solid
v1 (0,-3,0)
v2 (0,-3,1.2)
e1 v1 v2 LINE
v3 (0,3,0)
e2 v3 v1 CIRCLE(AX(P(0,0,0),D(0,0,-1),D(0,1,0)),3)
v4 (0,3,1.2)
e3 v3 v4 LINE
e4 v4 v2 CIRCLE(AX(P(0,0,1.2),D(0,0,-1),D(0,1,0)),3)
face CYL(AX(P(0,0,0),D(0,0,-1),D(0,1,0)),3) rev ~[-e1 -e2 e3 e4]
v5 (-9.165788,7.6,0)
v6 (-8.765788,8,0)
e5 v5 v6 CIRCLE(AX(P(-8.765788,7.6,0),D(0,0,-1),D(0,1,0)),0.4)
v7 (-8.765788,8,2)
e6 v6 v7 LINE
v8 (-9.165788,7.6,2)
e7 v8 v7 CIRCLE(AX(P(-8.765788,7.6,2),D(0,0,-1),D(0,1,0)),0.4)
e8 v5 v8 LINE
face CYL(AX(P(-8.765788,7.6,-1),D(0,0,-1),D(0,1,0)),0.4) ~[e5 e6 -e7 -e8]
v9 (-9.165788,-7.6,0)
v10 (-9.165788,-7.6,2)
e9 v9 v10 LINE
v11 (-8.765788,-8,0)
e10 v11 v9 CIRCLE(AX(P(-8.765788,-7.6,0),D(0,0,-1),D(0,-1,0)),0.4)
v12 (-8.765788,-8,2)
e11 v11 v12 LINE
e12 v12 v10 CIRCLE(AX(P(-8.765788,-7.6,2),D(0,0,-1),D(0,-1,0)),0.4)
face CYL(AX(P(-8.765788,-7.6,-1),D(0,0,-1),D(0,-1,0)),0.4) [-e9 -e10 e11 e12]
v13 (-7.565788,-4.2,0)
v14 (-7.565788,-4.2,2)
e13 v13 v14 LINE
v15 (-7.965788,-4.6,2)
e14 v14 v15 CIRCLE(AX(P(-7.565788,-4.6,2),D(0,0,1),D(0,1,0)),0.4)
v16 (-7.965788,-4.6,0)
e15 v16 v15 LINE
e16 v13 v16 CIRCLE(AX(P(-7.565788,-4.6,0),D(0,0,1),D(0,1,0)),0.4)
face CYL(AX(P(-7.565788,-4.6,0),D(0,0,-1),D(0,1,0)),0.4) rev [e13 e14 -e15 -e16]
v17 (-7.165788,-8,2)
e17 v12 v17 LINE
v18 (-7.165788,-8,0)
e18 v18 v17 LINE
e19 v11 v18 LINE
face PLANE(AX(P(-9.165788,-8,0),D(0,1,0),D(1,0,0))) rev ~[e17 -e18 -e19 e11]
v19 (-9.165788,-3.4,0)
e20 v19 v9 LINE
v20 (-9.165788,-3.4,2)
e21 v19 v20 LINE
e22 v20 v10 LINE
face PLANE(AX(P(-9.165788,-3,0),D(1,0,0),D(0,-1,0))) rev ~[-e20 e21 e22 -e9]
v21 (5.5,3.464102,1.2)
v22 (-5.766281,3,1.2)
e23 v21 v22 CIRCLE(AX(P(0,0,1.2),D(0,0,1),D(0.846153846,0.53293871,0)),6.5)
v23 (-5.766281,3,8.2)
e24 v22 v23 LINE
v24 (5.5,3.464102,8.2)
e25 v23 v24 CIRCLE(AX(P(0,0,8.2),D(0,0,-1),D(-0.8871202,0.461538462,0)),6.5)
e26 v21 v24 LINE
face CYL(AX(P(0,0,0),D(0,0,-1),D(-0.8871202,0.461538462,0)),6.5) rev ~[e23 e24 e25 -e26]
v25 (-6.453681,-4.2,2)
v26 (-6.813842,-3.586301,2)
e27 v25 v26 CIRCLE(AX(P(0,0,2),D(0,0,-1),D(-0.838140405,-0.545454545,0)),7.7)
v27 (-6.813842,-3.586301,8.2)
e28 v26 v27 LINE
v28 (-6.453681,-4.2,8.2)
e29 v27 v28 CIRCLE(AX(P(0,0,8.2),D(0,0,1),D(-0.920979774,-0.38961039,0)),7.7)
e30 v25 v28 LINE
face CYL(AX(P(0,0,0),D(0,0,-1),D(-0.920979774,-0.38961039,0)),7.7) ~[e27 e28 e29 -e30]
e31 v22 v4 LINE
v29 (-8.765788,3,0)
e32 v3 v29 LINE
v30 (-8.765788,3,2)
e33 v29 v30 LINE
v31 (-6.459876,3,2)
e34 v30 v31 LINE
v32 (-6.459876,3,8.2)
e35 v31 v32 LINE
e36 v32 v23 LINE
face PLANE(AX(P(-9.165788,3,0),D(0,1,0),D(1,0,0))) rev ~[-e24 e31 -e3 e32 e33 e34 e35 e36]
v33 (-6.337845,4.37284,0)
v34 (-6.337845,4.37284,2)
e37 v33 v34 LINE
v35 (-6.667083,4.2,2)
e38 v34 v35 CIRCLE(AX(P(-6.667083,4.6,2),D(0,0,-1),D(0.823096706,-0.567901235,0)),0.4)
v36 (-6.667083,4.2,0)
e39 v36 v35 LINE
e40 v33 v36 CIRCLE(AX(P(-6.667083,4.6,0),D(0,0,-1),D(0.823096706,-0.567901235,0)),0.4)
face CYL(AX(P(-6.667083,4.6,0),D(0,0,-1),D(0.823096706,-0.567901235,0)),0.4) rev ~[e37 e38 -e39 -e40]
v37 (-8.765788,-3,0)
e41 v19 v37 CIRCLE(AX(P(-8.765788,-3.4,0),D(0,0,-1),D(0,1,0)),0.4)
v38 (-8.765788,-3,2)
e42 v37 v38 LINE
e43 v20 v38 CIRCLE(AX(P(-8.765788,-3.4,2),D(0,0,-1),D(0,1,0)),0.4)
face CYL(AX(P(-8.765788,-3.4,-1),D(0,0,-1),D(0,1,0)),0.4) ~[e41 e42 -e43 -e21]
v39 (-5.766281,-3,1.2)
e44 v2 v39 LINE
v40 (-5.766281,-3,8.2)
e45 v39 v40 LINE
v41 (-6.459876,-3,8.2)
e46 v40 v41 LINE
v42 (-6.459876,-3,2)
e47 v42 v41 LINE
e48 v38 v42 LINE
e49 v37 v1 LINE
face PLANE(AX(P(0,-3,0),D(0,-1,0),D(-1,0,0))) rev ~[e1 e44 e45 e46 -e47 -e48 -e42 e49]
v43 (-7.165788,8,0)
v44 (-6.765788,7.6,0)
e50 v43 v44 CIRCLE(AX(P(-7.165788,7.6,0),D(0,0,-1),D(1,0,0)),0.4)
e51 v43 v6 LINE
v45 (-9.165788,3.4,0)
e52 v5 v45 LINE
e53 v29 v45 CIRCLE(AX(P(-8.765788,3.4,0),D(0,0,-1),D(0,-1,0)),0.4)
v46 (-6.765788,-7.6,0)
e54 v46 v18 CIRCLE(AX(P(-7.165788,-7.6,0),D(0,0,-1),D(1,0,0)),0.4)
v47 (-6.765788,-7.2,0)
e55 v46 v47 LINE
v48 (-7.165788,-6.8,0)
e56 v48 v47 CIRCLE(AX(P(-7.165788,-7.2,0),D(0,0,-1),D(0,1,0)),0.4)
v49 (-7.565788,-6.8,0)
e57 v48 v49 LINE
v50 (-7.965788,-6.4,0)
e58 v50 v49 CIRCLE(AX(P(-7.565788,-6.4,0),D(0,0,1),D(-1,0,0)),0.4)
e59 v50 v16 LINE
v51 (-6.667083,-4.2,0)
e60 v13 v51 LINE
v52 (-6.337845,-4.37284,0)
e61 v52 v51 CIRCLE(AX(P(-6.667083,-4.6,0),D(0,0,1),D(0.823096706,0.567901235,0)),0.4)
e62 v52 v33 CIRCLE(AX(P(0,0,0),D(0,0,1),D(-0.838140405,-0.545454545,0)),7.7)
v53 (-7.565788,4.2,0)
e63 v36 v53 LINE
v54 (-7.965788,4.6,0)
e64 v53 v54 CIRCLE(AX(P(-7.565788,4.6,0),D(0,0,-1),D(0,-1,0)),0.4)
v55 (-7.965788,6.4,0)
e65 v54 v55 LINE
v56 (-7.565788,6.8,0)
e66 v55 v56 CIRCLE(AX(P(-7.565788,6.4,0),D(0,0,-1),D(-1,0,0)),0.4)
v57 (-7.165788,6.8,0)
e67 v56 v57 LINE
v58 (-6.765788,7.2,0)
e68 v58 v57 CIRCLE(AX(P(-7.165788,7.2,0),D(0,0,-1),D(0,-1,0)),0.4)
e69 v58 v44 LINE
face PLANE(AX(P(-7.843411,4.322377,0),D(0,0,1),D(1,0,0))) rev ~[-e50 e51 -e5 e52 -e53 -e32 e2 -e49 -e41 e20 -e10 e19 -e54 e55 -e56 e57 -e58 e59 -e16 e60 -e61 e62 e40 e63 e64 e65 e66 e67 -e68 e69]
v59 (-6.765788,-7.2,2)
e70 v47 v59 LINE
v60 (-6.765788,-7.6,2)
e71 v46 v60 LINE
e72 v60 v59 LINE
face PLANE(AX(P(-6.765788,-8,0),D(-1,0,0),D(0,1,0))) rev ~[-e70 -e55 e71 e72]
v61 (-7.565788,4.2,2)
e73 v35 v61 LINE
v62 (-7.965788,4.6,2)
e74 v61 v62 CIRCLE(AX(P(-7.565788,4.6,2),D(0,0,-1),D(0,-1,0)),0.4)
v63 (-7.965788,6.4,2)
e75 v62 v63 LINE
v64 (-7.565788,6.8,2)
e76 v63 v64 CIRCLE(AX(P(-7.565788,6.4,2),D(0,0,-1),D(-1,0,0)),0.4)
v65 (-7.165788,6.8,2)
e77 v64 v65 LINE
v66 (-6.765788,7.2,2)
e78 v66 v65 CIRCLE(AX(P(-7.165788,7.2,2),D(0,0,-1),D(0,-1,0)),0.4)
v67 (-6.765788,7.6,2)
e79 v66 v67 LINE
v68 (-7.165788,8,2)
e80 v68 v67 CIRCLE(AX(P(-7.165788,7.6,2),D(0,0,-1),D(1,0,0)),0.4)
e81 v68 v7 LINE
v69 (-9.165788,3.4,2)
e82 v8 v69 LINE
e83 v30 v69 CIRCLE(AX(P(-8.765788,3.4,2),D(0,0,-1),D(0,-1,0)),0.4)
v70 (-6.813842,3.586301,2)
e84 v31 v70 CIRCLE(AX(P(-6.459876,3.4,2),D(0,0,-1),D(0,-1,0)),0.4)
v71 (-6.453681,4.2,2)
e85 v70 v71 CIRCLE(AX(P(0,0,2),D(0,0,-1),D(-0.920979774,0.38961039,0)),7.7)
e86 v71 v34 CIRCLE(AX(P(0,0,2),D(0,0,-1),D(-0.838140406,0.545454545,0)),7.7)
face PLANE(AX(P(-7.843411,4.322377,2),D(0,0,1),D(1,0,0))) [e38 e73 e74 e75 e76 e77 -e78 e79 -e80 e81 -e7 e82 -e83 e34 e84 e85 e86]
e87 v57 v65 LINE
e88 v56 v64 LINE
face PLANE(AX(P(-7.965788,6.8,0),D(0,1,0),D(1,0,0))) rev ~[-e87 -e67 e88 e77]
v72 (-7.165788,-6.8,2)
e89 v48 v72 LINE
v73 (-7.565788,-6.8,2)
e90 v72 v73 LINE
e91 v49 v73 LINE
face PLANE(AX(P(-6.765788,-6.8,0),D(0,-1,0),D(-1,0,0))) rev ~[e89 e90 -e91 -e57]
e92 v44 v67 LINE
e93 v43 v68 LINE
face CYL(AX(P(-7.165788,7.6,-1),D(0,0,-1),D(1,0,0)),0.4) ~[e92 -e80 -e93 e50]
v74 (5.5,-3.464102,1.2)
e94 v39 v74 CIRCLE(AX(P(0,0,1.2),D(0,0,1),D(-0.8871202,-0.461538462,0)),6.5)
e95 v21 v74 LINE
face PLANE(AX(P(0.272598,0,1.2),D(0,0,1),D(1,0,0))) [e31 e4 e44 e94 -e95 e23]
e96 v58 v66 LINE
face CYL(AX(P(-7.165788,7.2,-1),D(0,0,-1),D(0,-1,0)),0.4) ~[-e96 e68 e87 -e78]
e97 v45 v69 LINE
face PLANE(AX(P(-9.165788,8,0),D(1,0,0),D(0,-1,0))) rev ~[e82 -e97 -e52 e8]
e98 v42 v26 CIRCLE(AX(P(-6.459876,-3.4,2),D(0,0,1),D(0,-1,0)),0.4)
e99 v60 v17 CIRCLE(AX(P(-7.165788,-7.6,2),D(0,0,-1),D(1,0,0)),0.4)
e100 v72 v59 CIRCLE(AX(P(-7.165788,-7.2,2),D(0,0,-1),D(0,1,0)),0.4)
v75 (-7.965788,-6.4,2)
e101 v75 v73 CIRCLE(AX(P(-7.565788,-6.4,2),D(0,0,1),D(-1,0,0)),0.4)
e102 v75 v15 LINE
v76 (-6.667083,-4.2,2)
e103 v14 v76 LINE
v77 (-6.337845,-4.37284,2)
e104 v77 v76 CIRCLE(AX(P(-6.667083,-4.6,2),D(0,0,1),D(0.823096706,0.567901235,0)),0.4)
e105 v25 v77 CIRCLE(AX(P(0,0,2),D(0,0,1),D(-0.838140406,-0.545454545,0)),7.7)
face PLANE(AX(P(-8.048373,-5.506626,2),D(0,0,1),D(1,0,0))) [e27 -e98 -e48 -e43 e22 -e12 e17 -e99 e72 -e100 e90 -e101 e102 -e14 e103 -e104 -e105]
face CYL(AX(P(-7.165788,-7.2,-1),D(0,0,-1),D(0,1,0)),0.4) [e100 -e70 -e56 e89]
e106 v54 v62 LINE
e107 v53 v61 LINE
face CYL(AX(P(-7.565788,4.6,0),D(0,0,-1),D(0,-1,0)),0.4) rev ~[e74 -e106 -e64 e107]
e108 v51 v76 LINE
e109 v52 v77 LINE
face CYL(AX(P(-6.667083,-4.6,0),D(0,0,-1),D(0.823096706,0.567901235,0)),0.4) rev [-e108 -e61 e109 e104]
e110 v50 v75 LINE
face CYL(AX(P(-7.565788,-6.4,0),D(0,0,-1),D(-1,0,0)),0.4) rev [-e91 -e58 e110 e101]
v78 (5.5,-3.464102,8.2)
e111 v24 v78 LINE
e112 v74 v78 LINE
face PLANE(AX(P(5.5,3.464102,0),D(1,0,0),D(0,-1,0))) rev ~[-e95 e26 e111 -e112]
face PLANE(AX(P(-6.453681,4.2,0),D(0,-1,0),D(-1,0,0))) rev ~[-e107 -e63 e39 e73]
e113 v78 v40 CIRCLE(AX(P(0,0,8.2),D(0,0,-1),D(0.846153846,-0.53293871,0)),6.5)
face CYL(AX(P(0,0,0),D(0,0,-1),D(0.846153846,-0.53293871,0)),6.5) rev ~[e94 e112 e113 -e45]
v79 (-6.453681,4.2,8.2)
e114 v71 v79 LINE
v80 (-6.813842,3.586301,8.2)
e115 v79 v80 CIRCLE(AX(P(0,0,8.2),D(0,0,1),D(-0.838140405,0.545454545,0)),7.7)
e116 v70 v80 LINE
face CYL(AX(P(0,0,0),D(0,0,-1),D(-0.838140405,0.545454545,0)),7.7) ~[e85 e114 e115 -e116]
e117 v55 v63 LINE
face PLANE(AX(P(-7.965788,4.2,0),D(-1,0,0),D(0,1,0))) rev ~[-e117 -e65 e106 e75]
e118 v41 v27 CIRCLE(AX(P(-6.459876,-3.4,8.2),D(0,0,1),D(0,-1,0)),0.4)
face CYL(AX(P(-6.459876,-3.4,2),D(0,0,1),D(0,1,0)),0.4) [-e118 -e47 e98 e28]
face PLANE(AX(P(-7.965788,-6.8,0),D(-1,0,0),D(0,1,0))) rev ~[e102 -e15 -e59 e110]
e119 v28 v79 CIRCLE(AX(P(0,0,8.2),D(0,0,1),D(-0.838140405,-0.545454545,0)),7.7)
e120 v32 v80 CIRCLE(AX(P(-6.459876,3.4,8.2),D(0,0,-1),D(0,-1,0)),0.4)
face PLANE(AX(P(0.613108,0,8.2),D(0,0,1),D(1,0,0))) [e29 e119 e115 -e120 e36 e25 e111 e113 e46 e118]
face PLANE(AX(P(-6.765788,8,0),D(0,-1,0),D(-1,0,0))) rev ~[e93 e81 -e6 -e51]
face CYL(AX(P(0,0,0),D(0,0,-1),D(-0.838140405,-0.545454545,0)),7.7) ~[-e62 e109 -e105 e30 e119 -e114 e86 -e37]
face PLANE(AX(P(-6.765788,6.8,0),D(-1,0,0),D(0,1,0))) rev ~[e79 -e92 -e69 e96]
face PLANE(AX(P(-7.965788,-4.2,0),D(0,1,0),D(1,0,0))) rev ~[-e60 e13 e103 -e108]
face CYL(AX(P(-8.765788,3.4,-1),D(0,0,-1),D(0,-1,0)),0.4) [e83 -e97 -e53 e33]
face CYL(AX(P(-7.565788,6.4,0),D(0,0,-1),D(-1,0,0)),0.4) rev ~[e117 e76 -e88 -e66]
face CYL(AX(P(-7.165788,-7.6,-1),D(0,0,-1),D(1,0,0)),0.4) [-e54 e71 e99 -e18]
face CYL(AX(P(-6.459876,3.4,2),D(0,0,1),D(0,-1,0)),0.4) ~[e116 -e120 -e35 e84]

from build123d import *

# Parameters (mm, degrees)
F1_DEPTH    = 8.2
F2_DEPTH    = 1.2
F3_DEPTH    = 2
F4_R        = 0.4
F5_T1_DEPTH = 2
F5_T3_DEPTH = 4


# Not quite as in the source:
# - a fillet or chamfer that OpenCascade refuses, or shapes differently, is made with other operations: its cross-section is extruded or revolved along the edge and cut away or added
# - a feature names something its author has since deleted; it is built from what else it names


with BuildPart() as f1:
    # F0 (on Top) → F1 (new body)
    with BuildSketch(Plane.XY):
        with BuildLine():
            Line((-5.7662812973, -3), (-7.0915442606, -3))
            ThreePointArc((-7.0915442606, -3), (-6.7991383758, -3.6140997975), (-6.4536811201, -4.2))
            ThreePointArc((-6.4536811201, -4.2), (7.7, 0), (-6.4536811201, 4.2))
            ThreePointArc((-6.4536811201, 4.2), (-6.7991383758, 3.6140997975), (-7.0915442606, 3))
            Line((-7.0915442606, 3), (-5.7662812973, 3))
            ThreePointArc((-5.7662812973, 3), (-0.2675331935, 6.4944919732), (5.5, 3.4641016151))
            ThreePointArc((5.5, 3.4641016151), (6.5, 0), (5.5, -3.4641016151))
            ThreePointArc((5.5, -3.4641016151), (-0.2675331935, -6.4944919732), (-5.7662812973, -3))
        make_face()
        with BuildLine():
            Line((5.5, 3.4641016151), (5.5, -3.4641016151))
            ThreePointArc((5.5, -3.4641016151), (6.5, 0), (5.5, 3.4641016151))
        make_face()
    extrude(amount=F1_DEPTH)

    # F0 (on Top) → F2 (join)
    with BuildSketch(Plane.XY):
        with BuildLine():
            Line((0, -3), (-5.7662812973, -3))
            ThreePointArc((-5.7662812973, -3), (-0.2675331935, -6.4944919732), (5.5, -3.4641016151))
            Line((5.5, -3.4641016151), (5.5, 3.4641016151))
            ThreePointArc((5.5, 3.4641016151), (-0.2675331935, 6.4944919732), (-5.7662812973, 3))
            Line((-5.7662812973, 3), (0, 3))
            ThreePointArc((0, 3), (3, 0), (0, -3))
        make_face()
        with BuildLine():
            Line((5.5, 3.4641016151), (5.5, -3.4641016151))
            ThreePointArc((5.5, -3.4641016151), (6.5, 0), (5.5, 3.4641016151))
        make_face()
    extrude(amount=F2_DEPTH)

    # F0 (on Top) → F3 (join)
    with BuildSketch(Plane.XY):
        with BuildLine():
            ThreePointArc((-7.0915442606, 3), (-6.7991383758, 3.6140997975), (-6.4536811201, 4.2))
            Line((-6.4536811201, 4.2), (-7.9657880694, 4.2))
            Line((-7.9657880694, 4.2), (-7.9657880694, 6.8))
            Line((-7.9657880694, 6.8), (-6.7657880694, 6.8))
            Line((-6.7657880694, 6.8), (-6.7657880694, 8))
            Line((-6.7657880694, 8), (-7.9657880694, 8))
            Line((-7.9657880694, 8), (-9.1657880694, 8))
            Line((-9.1657880694, 8), (-9.1657880694, 3))
            Line((-9.1657880694, 3), (-7.0915442606, 3))
        make_face()
        with BuildLine():
            ThreePointArc((-6.4536811201, -4.2), (-6.7991383758, -3.6140997975), (-7.0915442606, -3))
            Line((-7.0915442606, -3), (-9.1657880694, -3))
            Line((-9.1657880694, -3), (-9.1657880694, -8))
            Line((-9.1657880694, -8), (-7.9657880694, -8))
            Line((-7.9657880694, -8), (-6.7657880694, -8))
            Line((-6.7657880694, -8), (-6.7657880694, -6.8))
            Line((-6.7657880694, -6.8), (-7.9657880694, -6.8))
            Line((-7.9657880694, -6.8), (-7.9657880694, -4.2))
            Line((-7.9657880694, -4.2), (-6.4536811201, -4.2))
        make_face()
    extrude(amount=F3_DEPTH)

    # F4
    f4_edges = [f1.edges().sort_by_distance(p)[0] for p in [
        (-7.091544, 3, 5.1),
        (-7.091544, -3, 5.1),
    ]]
    fillet(f4_edges, radius=F4_R)

    # F5: fillet of radius 0.4 on 14 edges, made by hand

    # F5_s2 → F5_t1 (join)
    with BuildSketch(Plane.XY):
        with BuildLine():
            ThreePointArc((-7.5657880694, 4.2), (-7.8486307818, 4.3171572875), (-7.9657880694, 4.6))
            Line((-7.9657880694, 4.6), (-7.9657880694, 4.2))
            Line((-7.9657880694, 4.2), (-7.5657880694, 4.2))
        make_face()
        with BuildLine():
            ThreePointArc((-6.3378446378, 4.3728395062), (-6.48115887, 4.2458360567), (-6.6670833203, 4.2))
            Line((-6.6670833203, 4.2), (-6.4536811201, 4.2))
            ThreePointArc((-6.4536811201, 4.2), (-6.3963467056, 4.2868110318), (-6.3378446378, 4.3728395062))
        make_face()
        with BuildLine():
            ThreePointArc((-6.3378446378, -4.3728395062), (-6.48115887, -4.2458360567), (-6.6670833203, -4.2))
            Line((-6.6670833203, -4.2), (-6.4536811201, -4.2))
            ThreePointArc((-6.4536811201, -4.2), (-6.3963467056, -4.2868110318), (-6.3378446378, -4.3728395062))
        make_face()
        with BuildLine():
            ThreePointArc((-7.5657880694, -4.2), (-7.8486307818, -4.3171572875), (-7.9657880694, -4.6))
            Line((-7.9657880694, -4.6), (-7.9657880694, -4.2))
            Line((-7.9657880694, -4.2), (-7.5657880694, -4.2))
        make_face()
        with BuildLine():
            ThreePointArc((-7.9657880694, -6.4), (-7.8486307818, -6.6828427125), (-7.5657880694, -6.8))
            Line((-7.5657880694, -6.8), (-7.9657880694, -6.8))
            Line((-7.9657880694, -6.8), (-7.9657880694, -6.4))
        make_face()
        with BuildLine():
            ThreePointArc((-7.9657880694, 6.4), (-7.8486307818, 6.6828427125), (-7.5657880694, 6.8))
            Line((-7.5657880694, 6.8), (-7.9657880694, 6.8))
            Line((-7.9657880694, 6.8), (-7.9657880694, 6.4))
        make_face()
    extrude(amount=F5_T1_DEPTH)

    # F5_s4 → F5_t3 (cut)
    with BuildSketch(Plane.XY.offset(-1)):
        with BuildLine():
            ThreePointArc((-8.7657880694, -8), (-9.0486307818, -7.8828427125), (-9.1657880694, -7.6))
            Line((-9.1657880694, -7.6), (-9.1657880694, -8))
            Line((-9.1657880694, -8), (-8.7657880694, -8))
        make_face()
        with BuildLine():
            ThreePointArc((-8.7657880694, -3), (-9.0486307818, -3.1171572875), (-9.1657880694, -3.4))
            Line((-9.1657880694, -3.4), (-9.1657880694, -3))
            Line((-9.1657880694, -3), (-8.7657880694, -3))
        make_face()
        with BuildLine():
            ThreePointArc((-8.7657880694, 3), (-9.0486307818, 3.1171572875), (-9.1657880694, 3.4))
            Line((-9.1657880694, 3.4), (-9.1657880694, 3))
            Line((-9.1657880694, 3), (-8.7657880694, 3))
        make_face()
        with BuildLine():
            ThreePointArc((-8.7657880694, 8), (-9.0486307818, 7.8828427125), (-9.1657880694, 7.6))
            Line((-9.1657880694, 7.6), (-9.1657880694, 8))
            Line((-9.1657880694, 8), (-8.7657880694, 8))
        make_face()
        with BuildLine():
            ThreePointArc((-7.1657880694, 6.8), (-6.8829453569, 6.9171572875), (-6.7657880694, 7.2))
            Line((-6.7657880694, 7.2), (-6.7657880694, 6.8))
            Line((-6.7657880694, 6.8), (-7.1657880694, 6.8))
        make_face()
        with BuildLine():
            ThreePointArc((-6.7657880694, -7.6), (-6.8829453569, -7.8828427125), (-7.1657880694, -8))
            Line((-7.1657880694, -8), (-6.7657880694, -8))
            Line((-6.7657880694, -8), (-6.7657880694, -7.6))
        make_face()
        with BuildLine():
            ThreePointArc((-7.1657880694, -6.8), (-6.8829453569, -6.9171572875), (-6.7657880694, -7.2))
            Line((-6.7657880694, -7.2), (-6.7657880694, -6.8))
            Line((-6.7657880694, -6.8), (-7.1657880694, -6.8))
        make_face()
        with BuildLine():
            ThreePointArc((-6.7657880694, 7.6), (-6.8829453569, 7.8828427125), (-7.1657880694, 8))
            Line((-7.1657880694, 8), (-6.7657880694, 8))
            Line((-6.7657880694, 8), (-6.7657880694, 7.6))
        make_face()
    extrude(amount=F5_T3_DEPTH, mode=Mode.SUBTRACT)


solid = f1.part
